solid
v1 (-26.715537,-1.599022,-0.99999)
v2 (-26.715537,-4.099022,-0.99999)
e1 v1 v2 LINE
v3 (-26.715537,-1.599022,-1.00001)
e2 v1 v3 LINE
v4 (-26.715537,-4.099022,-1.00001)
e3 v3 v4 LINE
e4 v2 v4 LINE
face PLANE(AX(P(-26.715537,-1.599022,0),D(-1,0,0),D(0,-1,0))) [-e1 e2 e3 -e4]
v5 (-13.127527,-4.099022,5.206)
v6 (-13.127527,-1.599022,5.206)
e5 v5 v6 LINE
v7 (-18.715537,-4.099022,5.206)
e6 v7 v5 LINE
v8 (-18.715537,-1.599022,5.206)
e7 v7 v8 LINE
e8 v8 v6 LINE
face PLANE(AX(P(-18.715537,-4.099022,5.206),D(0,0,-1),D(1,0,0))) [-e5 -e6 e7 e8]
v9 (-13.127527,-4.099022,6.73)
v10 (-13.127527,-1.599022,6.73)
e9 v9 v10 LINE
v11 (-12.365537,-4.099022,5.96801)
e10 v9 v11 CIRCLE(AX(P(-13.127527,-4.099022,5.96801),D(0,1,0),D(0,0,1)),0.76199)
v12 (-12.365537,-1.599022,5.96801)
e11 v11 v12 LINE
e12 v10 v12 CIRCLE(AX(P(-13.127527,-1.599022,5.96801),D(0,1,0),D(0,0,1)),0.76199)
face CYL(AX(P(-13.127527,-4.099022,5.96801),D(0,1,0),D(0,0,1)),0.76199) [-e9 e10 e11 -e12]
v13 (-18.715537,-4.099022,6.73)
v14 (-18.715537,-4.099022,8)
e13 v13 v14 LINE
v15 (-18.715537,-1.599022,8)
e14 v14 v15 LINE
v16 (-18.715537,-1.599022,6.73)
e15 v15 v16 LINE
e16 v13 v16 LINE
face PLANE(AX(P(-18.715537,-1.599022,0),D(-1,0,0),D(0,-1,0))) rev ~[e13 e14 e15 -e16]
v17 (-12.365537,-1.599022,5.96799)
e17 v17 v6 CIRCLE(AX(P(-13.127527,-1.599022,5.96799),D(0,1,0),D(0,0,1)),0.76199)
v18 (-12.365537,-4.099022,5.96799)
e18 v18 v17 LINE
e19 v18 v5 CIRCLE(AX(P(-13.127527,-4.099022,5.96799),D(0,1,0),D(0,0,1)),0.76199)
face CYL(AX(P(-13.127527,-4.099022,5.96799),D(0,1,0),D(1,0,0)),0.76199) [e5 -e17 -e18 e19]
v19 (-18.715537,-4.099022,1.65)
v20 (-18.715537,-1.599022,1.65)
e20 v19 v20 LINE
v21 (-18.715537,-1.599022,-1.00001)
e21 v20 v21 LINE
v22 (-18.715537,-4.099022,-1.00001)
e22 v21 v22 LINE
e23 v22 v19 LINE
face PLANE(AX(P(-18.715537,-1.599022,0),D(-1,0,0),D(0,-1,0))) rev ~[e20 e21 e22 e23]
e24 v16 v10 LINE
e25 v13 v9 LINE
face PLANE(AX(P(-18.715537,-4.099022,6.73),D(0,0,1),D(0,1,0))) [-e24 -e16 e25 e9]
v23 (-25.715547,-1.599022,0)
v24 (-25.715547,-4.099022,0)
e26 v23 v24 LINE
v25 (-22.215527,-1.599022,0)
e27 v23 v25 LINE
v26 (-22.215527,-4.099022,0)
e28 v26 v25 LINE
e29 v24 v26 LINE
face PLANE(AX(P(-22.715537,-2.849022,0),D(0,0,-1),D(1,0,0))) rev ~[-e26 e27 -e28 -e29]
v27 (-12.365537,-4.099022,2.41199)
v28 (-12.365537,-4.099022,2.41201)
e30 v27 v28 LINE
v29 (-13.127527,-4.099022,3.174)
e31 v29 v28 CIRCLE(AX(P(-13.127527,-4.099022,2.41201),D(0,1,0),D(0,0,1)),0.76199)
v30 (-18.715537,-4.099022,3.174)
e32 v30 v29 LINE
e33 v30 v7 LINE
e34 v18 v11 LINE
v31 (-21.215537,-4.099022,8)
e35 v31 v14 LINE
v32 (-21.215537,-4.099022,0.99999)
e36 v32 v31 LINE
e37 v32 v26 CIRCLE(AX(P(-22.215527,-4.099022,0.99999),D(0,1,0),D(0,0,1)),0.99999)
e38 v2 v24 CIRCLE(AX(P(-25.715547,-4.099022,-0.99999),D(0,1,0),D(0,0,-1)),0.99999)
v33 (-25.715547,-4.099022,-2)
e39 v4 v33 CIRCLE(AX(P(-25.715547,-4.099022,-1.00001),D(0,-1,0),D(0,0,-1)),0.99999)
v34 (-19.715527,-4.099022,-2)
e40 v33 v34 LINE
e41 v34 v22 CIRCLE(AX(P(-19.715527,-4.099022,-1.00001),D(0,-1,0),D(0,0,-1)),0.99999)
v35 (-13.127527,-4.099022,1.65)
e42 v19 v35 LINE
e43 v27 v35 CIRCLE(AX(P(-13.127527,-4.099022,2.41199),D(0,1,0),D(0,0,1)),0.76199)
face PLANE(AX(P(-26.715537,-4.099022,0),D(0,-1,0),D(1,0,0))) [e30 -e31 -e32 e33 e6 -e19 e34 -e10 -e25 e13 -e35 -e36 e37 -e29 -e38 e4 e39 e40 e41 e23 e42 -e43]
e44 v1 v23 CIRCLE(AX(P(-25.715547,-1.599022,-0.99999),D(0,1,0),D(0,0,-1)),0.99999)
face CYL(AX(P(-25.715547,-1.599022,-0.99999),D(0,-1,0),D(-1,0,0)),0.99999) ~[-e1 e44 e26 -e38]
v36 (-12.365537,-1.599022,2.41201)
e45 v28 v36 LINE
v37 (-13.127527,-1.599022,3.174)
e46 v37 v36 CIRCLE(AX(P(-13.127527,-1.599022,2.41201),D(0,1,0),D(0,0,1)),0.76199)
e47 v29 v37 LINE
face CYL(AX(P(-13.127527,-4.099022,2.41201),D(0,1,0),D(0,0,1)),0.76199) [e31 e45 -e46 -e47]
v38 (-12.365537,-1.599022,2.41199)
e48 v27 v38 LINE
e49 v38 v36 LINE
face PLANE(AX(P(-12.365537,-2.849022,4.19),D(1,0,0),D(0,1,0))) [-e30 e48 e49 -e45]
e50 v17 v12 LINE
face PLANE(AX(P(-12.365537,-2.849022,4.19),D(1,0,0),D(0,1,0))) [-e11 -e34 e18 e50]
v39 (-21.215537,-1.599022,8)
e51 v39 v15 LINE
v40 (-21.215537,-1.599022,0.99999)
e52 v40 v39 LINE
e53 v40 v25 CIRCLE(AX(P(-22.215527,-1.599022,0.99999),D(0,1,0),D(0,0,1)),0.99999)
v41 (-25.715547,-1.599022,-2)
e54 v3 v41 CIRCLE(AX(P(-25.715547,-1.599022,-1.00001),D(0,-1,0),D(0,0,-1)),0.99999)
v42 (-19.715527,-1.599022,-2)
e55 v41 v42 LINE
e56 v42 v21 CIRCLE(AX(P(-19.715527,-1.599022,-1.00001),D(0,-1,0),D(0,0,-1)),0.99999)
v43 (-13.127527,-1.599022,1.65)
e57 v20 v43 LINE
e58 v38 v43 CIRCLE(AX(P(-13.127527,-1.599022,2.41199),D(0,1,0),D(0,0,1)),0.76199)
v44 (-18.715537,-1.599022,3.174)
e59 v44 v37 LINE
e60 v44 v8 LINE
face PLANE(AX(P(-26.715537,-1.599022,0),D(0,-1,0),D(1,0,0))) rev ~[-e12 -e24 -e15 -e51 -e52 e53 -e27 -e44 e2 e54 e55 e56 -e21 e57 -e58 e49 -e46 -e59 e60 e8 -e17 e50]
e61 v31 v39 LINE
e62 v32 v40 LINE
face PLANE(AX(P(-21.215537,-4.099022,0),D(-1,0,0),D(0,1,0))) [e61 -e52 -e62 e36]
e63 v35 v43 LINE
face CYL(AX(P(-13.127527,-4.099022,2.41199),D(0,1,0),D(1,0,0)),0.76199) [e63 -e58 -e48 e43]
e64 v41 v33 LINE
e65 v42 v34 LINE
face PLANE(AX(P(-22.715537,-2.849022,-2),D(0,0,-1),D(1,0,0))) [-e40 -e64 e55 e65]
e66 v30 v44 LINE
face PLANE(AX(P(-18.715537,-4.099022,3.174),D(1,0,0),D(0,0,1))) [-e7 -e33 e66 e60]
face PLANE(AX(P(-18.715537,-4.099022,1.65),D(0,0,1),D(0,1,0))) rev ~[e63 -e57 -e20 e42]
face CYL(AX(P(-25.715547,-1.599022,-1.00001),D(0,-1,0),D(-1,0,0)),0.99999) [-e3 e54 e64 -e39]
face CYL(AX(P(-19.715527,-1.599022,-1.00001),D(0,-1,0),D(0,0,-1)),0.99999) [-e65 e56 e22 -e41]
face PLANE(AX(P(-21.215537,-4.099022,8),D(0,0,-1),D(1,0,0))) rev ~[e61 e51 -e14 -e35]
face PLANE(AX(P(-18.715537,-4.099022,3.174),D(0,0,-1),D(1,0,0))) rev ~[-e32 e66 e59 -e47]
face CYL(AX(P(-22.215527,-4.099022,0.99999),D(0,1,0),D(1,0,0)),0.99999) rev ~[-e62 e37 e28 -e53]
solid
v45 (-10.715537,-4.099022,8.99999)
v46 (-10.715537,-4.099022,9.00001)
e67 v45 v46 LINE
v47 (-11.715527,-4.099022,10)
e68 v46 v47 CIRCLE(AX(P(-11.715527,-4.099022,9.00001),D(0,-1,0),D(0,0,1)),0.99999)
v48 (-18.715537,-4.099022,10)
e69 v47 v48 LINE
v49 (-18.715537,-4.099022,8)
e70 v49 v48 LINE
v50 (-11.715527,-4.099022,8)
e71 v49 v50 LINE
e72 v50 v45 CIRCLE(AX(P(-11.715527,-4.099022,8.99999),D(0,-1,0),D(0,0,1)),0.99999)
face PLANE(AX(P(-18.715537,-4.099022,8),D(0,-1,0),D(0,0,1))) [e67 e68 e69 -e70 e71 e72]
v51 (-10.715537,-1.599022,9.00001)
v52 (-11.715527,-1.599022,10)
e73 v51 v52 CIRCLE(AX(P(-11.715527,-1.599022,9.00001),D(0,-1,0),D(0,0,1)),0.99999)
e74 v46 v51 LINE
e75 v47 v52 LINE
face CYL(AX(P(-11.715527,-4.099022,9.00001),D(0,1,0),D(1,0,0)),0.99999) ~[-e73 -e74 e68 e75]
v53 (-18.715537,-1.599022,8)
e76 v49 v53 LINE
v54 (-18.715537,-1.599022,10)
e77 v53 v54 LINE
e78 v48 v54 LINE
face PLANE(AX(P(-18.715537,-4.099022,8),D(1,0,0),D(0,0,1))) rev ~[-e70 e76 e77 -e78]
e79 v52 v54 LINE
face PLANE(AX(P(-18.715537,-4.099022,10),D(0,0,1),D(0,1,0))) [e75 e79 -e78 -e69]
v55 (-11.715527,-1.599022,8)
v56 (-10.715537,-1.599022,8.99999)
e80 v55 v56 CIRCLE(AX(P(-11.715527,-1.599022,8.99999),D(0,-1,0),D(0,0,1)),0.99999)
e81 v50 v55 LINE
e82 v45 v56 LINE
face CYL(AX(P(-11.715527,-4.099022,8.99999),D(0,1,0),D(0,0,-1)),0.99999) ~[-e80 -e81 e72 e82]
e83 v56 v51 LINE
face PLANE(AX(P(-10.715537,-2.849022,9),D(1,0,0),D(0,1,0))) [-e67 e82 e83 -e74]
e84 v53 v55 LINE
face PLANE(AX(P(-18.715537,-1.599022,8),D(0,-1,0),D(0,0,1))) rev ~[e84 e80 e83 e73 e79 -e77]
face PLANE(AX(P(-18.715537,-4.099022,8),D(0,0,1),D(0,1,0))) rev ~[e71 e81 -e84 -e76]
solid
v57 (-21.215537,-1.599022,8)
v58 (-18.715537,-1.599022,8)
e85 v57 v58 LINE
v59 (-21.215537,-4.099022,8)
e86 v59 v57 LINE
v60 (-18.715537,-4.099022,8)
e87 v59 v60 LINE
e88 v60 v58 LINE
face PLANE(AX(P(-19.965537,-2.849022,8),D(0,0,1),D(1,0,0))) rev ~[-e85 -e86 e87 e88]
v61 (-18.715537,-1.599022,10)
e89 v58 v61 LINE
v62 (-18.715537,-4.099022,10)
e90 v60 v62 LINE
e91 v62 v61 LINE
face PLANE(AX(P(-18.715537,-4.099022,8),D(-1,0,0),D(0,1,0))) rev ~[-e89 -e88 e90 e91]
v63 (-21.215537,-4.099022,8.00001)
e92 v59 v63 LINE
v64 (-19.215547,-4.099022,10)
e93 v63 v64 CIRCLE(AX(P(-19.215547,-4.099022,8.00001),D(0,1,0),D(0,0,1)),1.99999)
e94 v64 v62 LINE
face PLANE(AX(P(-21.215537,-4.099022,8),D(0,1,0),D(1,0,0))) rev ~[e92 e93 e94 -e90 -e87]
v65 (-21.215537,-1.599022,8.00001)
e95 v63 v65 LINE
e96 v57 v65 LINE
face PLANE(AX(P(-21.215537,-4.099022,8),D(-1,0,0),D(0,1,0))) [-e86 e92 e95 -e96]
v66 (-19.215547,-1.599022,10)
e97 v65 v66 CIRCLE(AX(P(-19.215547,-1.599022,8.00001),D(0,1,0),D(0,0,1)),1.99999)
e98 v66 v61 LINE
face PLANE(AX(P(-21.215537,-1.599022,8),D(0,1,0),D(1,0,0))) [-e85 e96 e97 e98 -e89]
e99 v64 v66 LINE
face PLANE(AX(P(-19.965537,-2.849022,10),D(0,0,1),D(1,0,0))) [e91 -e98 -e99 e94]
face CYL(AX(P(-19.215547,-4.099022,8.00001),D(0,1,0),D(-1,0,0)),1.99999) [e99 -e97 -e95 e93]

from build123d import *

# Parameters (mm, degrees)
F0_W      = 2.5
F0_H      = 2.5
F1_DEPTH  = 10
F2_W      = 2.5
F2_H      = 2
F3_DEPTH  = 8
F4_W      = 2.5
F4_H      = 2
F5_DEPTH  = 2.5
F6_W      = 8
F6_H      = 2.5
F7_DEPTH  = 2
F8_R      = 0.99999
F9_W      = 2.5
F9_H      = 2.5
F10_DEPTH = 2
F11_R     = 1.99999
F12_W     = 2.5
F12_H     = 5.08
F13_DEPTH = 6.35
F14_W     = 6.35
F14_H     = 2.032
F15_DEPTH = 2.501
F16_R     = 0.76199


# Not quite as in the source:
# - a fillet or chamfer is up to 0.001 mm smaller than in the source, because OpenCascade refuses the exact size


with BuildPart() as f1:
    # F0 (on Top) → F1 (new body)
    with BuildSketch(Plane.XY):
        with Locations((-19.965537297, -2.8490219265)):
            Rectangle(F0_W, F0_H)
    extrude(amount=F1_DEPTH)

    # F2 (on face) → F3 (join)
    with BuildSketch(Plane.YZ.offset(-18.715537297)):
        with Locations((-2.8490219265, 9)):
            Rectangle(F2_W, F2_H)
    extrude(amount=F3_DEPTH)

    # F4 (on face) → F5 (cut, through all)
    with BuildSketch(Plane.XZ.offset(4.0990219265)):
        with Locations((-19.965537297, 9)):
            Rectangle(F4_W, F4_H)
    extrude(amount=-F5_DEPTH, mode=Mode.SUBTRACT)

    # F6 (on face) → F7 (join)
    with BuildSketch(Plane(origin=(0, 0, 0), x_dir=(1, 0, 0), z_dir=(0, 0, -1))):
        with Locations((-22.715537297, 2.8490219265)):
            Rectangle(F6_W, F6_H)
    extrude(amount=F7_DEPTH)

    # F8 (radius 1 in the source; OpenCascade refuses exactly that, so slightly less here)
    f8_edges = [f1.edges().sort_by_distance(p)[0] for p in [
        (-21.215537, -2.849022, 0),
        (-26.715537, -2.849022, 0),
        (-10.715537, -2.849022, 10),
        (-10.715537, -2.849022, 8),
        (-18.715537, -2.849022, -2),
        (-26.715537, -2.849022, -2),
    ]]
    fillet(f8_edges, radius=F8_R)

    # F12 (on face) → F13 (join)
    with BuildSketch(Plane.YZ.offset(-18.715537297)):
        with Locations((-2.8490219265, 4.19)):
            Rectangle(F12_W, F12_H)
    extrude(amount=F13_DEPTH)

    # F14 (on face) → F15 (cut, through all)
    with BuildSketch(Plane.XZ.offset(4.0990219265)):
        with Locations((-15.540537297, 4.19)):
            Rectangle(F14_W, F14_H)
    extrude(amount=-F15_DEPTH, mode=Mode.SUBTRACT)

    # F16 (radius 0.762 in the source; OpenCascade refuses exactly that, so slightly less here)
    f16_edges = [f1.edges().sort_by_distance(p)[0] for p in [
        (-12.365537, -2.849022, 6.73),
        (-12.365537, -2.849022, 5.206),
        (-12.365537, -2.849022, 3.174),
        (-12.365537, -2.849022, 1.65),
    ]]
    fillet(f16_edges, radius=F16_R)


with BuildPart() as f10:
    # F9 (on face) → F10 (new body, through all)
    with BuildSketch(Plane.XY.offset(8)):
        with Locations((-19.965537297, -2.8490219265)):
            Rectangle(F9_W, F9_H)
    extrude(amount=F10_DEPTH)

    # F11 (radius 2 in the source; OpenCascade refuses exactly that, so slightly less here)
    f11_edges = [f10.edges().sort_by_distance(p)[0] for p in [
        (-21.215537, -2.849022, 10),
    ]]
    fillet(f11_edges, radius=F11_R)


solid = Compound([f1.part, f10.part])
